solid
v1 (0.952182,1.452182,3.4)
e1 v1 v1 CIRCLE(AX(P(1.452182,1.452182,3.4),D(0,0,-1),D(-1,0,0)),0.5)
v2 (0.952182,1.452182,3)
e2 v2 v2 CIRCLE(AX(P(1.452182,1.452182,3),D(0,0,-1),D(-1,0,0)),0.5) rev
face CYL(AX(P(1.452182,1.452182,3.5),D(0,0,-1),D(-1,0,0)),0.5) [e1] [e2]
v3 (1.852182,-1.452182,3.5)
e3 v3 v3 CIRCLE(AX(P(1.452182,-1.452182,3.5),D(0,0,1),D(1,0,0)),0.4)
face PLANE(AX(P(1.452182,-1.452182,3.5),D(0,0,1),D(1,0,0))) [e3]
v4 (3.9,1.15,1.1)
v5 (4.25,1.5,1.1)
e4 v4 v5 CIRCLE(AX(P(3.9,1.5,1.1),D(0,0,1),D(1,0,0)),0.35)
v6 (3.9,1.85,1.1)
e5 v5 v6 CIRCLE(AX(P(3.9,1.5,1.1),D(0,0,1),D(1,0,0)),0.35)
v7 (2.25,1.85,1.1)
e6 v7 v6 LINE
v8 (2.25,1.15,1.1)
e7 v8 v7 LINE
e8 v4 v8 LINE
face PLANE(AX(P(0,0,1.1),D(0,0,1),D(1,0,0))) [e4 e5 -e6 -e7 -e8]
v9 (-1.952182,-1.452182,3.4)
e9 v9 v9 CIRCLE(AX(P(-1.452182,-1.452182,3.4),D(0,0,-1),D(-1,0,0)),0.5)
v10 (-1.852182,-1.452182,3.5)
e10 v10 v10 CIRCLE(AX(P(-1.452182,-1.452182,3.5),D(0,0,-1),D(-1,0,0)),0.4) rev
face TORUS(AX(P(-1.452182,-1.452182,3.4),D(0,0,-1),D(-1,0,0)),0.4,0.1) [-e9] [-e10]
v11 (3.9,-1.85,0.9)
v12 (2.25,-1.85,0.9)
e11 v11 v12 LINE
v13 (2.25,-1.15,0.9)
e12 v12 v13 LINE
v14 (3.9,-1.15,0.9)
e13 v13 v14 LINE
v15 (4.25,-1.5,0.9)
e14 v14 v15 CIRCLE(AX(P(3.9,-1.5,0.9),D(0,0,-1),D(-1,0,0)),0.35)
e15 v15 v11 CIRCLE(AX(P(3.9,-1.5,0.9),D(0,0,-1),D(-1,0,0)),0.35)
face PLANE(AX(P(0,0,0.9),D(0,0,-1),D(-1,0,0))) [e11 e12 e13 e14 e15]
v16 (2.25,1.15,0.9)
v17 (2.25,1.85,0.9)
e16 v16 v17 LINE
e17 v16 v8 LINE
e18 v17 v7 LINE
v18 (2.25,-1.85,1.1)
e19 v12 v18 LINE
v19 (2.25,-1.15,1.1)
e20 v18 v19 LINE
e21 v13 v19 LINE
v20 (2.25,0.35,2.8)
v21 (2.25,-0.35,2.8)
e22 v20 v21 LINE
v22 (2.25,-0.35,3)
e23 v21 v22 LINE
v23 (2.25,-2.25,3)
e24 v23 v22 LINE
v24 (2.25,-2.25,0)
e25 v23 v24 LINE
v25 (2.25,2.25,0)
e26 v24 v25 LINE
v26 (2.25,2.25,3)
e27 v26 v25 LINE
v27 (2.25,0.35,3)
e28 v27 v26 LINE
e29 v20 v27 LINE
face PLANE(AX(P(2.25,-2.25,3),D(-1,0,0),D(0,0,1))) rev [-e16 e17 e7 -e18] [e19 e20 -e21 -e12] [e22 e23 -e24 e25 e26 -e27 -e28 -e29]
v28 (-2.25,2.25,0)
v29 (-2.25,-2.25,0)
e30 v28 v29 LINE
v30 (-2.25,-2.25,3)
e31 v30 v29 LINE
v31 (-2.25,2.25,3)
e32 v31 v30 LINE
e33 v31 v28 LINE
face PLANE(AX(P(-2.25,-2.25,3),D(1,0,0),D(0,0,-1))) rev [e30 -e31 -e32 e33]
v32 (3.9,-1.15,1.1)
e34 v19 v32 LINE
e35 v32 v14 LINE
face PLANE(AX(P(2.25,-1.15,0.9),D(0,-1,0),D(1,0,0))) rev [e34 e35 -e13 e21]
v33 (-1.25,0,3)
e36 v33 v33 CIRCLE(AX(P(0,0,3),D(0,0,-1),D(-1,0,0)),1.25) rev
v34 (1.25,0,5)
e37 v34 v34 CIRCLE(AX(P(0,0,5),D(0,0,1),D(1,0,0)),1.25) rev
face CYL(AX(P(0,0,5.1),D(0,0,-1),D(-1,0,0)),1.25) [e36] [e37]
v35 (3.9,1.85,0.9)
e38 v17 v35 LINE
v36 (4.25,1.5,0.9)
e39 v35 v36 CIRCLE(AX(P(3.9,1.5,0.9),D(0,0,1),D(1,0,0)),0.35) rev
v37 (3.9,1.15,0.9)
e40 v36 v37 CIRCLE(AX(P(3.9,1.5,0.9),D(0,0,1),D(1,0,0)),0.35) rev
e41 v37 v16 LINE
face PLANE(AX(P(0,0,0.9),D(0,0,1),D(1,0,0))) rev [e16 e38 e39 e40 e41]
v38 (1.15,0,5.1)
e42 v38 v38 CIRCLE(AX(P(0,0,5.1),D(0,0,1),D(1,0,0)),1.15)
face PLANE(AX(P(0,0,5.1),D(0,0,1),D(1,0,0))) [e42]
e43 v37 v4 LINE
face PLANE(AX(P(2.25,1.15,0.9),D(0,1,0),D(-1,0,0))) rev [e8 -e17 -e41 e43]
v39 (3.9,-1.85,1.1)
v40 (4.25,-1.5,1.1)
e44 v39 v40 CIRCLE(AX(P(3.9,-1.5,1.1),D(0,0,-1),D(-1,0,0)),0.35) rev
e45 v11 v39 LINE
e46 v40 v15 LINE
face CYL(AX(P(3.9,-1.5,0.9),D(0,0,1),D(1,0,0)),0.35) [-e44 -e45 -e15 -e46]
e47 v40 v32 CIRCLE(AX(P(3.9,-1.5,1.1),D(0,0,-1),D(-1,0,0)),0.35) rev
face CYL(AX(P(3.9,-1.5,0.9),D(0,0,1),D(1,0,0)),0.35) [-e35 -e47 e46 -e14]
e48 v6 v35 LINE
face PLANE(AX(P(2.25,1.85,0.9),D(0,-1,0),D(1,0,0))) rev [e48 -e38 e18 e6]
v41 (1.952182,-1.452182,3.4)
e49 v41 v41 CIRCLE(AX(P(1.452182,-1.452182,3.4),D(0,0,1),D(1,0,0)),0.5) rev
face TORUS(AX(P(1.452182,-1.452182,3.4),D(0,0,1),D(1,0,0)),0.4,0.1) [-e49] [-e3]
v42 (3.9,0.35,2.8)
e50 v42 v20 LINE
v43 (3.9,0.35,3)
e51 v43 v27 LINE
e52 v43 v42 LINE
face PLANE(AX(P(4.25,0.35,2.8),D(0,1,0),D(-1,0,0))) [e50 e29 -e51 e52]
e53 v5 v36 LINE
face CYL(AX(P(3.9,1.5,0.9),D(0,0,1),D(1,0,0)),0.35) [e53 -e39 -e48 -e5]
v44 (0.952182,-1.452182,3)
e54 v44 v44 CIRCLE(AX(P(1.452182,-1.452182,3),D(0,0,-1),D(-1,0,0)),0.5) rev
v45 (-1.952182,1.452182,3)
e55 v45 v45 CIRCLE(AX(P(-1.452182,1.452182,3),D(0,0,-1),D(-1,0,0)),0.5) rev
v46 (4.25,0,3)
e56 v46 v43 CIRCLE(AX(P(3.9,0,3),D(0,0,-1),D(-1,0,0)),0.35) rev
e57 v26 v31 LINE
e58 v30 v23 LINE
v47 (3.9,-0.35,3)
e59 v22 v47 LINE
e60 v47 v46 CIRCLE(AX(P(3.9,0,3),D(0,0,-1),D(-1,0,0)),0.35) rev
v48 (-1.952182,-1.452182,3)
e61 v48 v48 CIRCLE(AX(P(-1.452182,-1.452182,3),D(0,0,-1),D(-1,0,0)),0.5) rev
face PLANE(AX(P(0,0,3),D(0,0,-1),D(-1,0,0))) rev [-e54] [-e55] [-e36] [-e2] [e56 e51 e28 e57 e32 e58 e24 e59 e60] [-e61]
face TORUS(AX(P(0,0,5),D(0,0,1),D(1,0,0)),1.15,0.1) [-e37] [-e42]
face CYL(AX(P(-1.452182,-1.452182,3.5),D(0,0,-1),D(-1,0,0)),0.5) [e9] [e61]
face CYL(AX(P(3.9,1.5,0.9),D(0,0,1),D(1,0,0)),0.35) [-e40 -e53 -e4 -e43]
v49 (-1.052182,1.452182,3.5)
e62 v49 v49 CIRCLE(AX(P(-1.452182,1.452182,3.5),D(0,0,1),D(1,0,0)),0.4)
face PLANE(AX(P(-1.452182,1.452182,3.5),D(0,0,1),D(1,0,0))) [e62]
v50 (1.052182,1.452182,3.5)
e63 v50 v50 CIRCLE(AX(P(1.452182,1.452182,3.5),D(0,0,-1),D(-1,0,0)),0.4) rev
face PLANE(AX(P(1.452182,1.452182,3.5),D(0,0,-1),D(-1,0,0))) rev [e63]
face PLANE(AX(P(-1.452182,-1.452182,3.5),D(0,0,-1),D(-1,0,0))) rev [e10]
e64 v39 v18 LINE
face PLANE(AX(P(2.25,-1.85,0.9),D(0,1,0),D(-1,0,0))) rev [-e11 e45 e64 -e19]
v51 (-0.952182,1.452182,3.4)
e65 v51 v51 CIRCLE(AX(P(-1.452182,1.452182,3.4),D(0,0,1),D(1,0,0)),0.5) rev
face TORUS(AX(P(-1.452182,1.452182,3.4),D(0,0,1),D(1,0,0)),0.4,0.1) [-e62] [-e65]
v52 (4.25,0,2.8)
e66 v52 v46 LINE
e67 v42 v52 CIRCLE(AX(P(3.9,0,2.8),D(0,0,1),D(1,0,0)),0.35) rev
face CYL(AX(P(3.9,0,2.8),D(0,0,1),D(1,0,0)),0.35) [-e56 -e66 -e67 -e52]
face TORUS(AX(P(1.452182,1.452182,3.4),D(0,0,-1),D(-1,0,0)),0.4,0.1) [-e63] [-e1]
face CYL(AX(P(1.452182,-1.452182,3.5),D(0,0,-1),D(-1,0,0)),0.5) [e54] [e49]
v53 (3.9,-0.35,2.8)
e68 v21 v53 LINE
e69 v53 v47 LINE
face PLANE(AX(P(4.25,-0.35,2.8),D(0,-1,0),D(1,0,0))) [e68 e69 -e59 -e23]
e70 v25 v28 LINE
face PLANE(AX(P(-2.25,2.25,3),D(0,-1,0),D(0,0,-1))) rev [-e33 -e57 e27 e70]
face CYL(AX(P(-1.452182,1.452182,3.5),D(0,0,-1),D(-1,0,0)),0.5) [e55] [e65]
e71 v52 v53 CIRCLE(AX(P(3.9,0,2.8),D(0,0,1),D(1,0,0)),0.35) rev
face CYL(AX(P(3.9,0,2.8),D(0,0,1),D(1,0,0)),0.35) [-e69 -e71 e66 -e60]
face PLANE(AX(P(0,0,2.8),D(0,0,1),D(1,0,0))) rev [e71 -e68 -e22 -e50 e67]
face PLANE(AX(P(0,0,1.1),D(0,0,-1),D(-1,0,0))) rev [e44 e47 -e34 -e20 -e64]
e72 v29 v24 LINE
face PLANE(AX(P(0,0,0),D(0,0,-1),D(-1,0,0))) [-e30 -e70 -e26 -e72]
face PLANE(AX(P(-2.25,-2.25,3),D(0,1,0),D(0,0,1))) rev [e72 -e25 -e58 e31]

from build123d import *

# Parameters (mm, degrees)
SKETCH1_W           = 4.5
SKETCH1_H           = 4.5
BOSS_EXTRUDE1_DEPTH = 3
SKETCH4_R           = 0.5
BOSS_EXTRUDE3_DEPTH = 0.5
FILLET1_R           = 0.1
SKETCH5_R           = 1.25
BOSS_EXTRUDE4_DEPTH = 2.1
FILLET2_R           = 0.1
SKETCH6_W           = 2
SKETCH6_H           = 0.7
BOSS_EXTRUDE5_DEPTH = 0.2
SKETCH7_W           = 2
SKETCH7_H           = 0.7
BOSS_EXTRUDE6_DEPTH = 0.1
FILLET3_R           = 0.35


with BuildPart() as part:
    # Sketch1 → Boss-Extrude1 (new body)
    with BuildSketch(Plane.XY):
        Rectangle(SKETCH1_W, SKETCH1_H)
    extrude(amount=BOSS_EXTRUDE1_DEPTH)

    # Sketch4 → Boss-Extrude3 (add)
    with BuildSketch(Plane.XY.offset(3)):
        with Locations(Location((-1.45218189, 1.45218189, 0), (0, 0, 180))):
            Circle(SKETCH4_R)
        with Locations(Location((1.45218189, 1.45218189, 0), (0, 0, 180))):
            Circle(SKETCH4_R)
        with Locations(Location((1.45218189, -1.45218189, 0), (0, 0, 180))):
            Circle(SKETCH4_R)
        with Locations(Location((-1.45218189, -1.45218189, 0), (0, 0, 180))):
            Circle(SKETCH4_R)
    extrude(amount=BOSS_EXTRUDE3_DEPTH)

    # Fillet1
    fillet1_edges = [part.edges().sort_by_distance(p)[0] for p in [
        (-0.95218189, 1.45218189, 3.5),
        (1.95218189, 1.45218189, 3.5),
        (1.95218189, -1.45218189, 3.5),
        (-0.95218189, -1.45218189, 3.5),
    ]]
    fillet(fillet1_edges, radius=FILLET1_R)

    # Sketch5 → Boss-Extrude4 (add)
    with BuildSketch(Plane.XY.offset(3)):
        with Locations(Location((0, 0, 0), (0, 0, 180))):
            Circle(SKETCH5_R)
    extrude(amount=BOSS_EXTRUDE4_DEPTH)

    # Fillet2
    fillet2_edges = [part.edges().sort_by_distance(p)[0] for p in [
        (1.25, 0, 5.1),
    ]]
    fillet(fillet2_edges, radius=FILLET2_R)

    # Sketch6 → Boss-Extrude5 (add)
    with BuildSketch(Plane.XY.offset(3)):
        with Locations((3.25, 0)):
            Rectangle(SKETCH6_W, SKETCH6_H)
    extrude(amount=-BOSS_EXTRUDE5_DEPTH)

    # Sketch7 → Boss-Extrude6 (add, symmetric)
    with BuildSketch(Plane(origin=(0, 0, 1), x_dir=(-1, 0, 0), z_dir=(0, 0, -1))):
        with Locations((-3.25, -1.5)):
            Rectangle(SKETCH7_W, SKETCH7_H)
        with Locations((-3.25, 1.5)):
            Rectangle(SKETCH7_W, SKETCH7_H)
    extrude(amount=BOSS_EXTRUDE6_DEPTH, both=True)

    # Fillet3
    fillet3_edges = [part.edges().sort_by_distance(p)[0] for p in [
        (4.25, 1.85, 1),
        (4.25, 1.15, 1),
        (4.25, -0.35, 2.9),
        (4.25, 0.35, 2.9),
        (4.25, -1.15, 1),
        (4.25, -1.85, 1),
    ]]
    fillet(fillet3_edges, radius=FILLET3_R - 0.0001)  # a hair under: the kernel refuses the full size


solid = part.part
